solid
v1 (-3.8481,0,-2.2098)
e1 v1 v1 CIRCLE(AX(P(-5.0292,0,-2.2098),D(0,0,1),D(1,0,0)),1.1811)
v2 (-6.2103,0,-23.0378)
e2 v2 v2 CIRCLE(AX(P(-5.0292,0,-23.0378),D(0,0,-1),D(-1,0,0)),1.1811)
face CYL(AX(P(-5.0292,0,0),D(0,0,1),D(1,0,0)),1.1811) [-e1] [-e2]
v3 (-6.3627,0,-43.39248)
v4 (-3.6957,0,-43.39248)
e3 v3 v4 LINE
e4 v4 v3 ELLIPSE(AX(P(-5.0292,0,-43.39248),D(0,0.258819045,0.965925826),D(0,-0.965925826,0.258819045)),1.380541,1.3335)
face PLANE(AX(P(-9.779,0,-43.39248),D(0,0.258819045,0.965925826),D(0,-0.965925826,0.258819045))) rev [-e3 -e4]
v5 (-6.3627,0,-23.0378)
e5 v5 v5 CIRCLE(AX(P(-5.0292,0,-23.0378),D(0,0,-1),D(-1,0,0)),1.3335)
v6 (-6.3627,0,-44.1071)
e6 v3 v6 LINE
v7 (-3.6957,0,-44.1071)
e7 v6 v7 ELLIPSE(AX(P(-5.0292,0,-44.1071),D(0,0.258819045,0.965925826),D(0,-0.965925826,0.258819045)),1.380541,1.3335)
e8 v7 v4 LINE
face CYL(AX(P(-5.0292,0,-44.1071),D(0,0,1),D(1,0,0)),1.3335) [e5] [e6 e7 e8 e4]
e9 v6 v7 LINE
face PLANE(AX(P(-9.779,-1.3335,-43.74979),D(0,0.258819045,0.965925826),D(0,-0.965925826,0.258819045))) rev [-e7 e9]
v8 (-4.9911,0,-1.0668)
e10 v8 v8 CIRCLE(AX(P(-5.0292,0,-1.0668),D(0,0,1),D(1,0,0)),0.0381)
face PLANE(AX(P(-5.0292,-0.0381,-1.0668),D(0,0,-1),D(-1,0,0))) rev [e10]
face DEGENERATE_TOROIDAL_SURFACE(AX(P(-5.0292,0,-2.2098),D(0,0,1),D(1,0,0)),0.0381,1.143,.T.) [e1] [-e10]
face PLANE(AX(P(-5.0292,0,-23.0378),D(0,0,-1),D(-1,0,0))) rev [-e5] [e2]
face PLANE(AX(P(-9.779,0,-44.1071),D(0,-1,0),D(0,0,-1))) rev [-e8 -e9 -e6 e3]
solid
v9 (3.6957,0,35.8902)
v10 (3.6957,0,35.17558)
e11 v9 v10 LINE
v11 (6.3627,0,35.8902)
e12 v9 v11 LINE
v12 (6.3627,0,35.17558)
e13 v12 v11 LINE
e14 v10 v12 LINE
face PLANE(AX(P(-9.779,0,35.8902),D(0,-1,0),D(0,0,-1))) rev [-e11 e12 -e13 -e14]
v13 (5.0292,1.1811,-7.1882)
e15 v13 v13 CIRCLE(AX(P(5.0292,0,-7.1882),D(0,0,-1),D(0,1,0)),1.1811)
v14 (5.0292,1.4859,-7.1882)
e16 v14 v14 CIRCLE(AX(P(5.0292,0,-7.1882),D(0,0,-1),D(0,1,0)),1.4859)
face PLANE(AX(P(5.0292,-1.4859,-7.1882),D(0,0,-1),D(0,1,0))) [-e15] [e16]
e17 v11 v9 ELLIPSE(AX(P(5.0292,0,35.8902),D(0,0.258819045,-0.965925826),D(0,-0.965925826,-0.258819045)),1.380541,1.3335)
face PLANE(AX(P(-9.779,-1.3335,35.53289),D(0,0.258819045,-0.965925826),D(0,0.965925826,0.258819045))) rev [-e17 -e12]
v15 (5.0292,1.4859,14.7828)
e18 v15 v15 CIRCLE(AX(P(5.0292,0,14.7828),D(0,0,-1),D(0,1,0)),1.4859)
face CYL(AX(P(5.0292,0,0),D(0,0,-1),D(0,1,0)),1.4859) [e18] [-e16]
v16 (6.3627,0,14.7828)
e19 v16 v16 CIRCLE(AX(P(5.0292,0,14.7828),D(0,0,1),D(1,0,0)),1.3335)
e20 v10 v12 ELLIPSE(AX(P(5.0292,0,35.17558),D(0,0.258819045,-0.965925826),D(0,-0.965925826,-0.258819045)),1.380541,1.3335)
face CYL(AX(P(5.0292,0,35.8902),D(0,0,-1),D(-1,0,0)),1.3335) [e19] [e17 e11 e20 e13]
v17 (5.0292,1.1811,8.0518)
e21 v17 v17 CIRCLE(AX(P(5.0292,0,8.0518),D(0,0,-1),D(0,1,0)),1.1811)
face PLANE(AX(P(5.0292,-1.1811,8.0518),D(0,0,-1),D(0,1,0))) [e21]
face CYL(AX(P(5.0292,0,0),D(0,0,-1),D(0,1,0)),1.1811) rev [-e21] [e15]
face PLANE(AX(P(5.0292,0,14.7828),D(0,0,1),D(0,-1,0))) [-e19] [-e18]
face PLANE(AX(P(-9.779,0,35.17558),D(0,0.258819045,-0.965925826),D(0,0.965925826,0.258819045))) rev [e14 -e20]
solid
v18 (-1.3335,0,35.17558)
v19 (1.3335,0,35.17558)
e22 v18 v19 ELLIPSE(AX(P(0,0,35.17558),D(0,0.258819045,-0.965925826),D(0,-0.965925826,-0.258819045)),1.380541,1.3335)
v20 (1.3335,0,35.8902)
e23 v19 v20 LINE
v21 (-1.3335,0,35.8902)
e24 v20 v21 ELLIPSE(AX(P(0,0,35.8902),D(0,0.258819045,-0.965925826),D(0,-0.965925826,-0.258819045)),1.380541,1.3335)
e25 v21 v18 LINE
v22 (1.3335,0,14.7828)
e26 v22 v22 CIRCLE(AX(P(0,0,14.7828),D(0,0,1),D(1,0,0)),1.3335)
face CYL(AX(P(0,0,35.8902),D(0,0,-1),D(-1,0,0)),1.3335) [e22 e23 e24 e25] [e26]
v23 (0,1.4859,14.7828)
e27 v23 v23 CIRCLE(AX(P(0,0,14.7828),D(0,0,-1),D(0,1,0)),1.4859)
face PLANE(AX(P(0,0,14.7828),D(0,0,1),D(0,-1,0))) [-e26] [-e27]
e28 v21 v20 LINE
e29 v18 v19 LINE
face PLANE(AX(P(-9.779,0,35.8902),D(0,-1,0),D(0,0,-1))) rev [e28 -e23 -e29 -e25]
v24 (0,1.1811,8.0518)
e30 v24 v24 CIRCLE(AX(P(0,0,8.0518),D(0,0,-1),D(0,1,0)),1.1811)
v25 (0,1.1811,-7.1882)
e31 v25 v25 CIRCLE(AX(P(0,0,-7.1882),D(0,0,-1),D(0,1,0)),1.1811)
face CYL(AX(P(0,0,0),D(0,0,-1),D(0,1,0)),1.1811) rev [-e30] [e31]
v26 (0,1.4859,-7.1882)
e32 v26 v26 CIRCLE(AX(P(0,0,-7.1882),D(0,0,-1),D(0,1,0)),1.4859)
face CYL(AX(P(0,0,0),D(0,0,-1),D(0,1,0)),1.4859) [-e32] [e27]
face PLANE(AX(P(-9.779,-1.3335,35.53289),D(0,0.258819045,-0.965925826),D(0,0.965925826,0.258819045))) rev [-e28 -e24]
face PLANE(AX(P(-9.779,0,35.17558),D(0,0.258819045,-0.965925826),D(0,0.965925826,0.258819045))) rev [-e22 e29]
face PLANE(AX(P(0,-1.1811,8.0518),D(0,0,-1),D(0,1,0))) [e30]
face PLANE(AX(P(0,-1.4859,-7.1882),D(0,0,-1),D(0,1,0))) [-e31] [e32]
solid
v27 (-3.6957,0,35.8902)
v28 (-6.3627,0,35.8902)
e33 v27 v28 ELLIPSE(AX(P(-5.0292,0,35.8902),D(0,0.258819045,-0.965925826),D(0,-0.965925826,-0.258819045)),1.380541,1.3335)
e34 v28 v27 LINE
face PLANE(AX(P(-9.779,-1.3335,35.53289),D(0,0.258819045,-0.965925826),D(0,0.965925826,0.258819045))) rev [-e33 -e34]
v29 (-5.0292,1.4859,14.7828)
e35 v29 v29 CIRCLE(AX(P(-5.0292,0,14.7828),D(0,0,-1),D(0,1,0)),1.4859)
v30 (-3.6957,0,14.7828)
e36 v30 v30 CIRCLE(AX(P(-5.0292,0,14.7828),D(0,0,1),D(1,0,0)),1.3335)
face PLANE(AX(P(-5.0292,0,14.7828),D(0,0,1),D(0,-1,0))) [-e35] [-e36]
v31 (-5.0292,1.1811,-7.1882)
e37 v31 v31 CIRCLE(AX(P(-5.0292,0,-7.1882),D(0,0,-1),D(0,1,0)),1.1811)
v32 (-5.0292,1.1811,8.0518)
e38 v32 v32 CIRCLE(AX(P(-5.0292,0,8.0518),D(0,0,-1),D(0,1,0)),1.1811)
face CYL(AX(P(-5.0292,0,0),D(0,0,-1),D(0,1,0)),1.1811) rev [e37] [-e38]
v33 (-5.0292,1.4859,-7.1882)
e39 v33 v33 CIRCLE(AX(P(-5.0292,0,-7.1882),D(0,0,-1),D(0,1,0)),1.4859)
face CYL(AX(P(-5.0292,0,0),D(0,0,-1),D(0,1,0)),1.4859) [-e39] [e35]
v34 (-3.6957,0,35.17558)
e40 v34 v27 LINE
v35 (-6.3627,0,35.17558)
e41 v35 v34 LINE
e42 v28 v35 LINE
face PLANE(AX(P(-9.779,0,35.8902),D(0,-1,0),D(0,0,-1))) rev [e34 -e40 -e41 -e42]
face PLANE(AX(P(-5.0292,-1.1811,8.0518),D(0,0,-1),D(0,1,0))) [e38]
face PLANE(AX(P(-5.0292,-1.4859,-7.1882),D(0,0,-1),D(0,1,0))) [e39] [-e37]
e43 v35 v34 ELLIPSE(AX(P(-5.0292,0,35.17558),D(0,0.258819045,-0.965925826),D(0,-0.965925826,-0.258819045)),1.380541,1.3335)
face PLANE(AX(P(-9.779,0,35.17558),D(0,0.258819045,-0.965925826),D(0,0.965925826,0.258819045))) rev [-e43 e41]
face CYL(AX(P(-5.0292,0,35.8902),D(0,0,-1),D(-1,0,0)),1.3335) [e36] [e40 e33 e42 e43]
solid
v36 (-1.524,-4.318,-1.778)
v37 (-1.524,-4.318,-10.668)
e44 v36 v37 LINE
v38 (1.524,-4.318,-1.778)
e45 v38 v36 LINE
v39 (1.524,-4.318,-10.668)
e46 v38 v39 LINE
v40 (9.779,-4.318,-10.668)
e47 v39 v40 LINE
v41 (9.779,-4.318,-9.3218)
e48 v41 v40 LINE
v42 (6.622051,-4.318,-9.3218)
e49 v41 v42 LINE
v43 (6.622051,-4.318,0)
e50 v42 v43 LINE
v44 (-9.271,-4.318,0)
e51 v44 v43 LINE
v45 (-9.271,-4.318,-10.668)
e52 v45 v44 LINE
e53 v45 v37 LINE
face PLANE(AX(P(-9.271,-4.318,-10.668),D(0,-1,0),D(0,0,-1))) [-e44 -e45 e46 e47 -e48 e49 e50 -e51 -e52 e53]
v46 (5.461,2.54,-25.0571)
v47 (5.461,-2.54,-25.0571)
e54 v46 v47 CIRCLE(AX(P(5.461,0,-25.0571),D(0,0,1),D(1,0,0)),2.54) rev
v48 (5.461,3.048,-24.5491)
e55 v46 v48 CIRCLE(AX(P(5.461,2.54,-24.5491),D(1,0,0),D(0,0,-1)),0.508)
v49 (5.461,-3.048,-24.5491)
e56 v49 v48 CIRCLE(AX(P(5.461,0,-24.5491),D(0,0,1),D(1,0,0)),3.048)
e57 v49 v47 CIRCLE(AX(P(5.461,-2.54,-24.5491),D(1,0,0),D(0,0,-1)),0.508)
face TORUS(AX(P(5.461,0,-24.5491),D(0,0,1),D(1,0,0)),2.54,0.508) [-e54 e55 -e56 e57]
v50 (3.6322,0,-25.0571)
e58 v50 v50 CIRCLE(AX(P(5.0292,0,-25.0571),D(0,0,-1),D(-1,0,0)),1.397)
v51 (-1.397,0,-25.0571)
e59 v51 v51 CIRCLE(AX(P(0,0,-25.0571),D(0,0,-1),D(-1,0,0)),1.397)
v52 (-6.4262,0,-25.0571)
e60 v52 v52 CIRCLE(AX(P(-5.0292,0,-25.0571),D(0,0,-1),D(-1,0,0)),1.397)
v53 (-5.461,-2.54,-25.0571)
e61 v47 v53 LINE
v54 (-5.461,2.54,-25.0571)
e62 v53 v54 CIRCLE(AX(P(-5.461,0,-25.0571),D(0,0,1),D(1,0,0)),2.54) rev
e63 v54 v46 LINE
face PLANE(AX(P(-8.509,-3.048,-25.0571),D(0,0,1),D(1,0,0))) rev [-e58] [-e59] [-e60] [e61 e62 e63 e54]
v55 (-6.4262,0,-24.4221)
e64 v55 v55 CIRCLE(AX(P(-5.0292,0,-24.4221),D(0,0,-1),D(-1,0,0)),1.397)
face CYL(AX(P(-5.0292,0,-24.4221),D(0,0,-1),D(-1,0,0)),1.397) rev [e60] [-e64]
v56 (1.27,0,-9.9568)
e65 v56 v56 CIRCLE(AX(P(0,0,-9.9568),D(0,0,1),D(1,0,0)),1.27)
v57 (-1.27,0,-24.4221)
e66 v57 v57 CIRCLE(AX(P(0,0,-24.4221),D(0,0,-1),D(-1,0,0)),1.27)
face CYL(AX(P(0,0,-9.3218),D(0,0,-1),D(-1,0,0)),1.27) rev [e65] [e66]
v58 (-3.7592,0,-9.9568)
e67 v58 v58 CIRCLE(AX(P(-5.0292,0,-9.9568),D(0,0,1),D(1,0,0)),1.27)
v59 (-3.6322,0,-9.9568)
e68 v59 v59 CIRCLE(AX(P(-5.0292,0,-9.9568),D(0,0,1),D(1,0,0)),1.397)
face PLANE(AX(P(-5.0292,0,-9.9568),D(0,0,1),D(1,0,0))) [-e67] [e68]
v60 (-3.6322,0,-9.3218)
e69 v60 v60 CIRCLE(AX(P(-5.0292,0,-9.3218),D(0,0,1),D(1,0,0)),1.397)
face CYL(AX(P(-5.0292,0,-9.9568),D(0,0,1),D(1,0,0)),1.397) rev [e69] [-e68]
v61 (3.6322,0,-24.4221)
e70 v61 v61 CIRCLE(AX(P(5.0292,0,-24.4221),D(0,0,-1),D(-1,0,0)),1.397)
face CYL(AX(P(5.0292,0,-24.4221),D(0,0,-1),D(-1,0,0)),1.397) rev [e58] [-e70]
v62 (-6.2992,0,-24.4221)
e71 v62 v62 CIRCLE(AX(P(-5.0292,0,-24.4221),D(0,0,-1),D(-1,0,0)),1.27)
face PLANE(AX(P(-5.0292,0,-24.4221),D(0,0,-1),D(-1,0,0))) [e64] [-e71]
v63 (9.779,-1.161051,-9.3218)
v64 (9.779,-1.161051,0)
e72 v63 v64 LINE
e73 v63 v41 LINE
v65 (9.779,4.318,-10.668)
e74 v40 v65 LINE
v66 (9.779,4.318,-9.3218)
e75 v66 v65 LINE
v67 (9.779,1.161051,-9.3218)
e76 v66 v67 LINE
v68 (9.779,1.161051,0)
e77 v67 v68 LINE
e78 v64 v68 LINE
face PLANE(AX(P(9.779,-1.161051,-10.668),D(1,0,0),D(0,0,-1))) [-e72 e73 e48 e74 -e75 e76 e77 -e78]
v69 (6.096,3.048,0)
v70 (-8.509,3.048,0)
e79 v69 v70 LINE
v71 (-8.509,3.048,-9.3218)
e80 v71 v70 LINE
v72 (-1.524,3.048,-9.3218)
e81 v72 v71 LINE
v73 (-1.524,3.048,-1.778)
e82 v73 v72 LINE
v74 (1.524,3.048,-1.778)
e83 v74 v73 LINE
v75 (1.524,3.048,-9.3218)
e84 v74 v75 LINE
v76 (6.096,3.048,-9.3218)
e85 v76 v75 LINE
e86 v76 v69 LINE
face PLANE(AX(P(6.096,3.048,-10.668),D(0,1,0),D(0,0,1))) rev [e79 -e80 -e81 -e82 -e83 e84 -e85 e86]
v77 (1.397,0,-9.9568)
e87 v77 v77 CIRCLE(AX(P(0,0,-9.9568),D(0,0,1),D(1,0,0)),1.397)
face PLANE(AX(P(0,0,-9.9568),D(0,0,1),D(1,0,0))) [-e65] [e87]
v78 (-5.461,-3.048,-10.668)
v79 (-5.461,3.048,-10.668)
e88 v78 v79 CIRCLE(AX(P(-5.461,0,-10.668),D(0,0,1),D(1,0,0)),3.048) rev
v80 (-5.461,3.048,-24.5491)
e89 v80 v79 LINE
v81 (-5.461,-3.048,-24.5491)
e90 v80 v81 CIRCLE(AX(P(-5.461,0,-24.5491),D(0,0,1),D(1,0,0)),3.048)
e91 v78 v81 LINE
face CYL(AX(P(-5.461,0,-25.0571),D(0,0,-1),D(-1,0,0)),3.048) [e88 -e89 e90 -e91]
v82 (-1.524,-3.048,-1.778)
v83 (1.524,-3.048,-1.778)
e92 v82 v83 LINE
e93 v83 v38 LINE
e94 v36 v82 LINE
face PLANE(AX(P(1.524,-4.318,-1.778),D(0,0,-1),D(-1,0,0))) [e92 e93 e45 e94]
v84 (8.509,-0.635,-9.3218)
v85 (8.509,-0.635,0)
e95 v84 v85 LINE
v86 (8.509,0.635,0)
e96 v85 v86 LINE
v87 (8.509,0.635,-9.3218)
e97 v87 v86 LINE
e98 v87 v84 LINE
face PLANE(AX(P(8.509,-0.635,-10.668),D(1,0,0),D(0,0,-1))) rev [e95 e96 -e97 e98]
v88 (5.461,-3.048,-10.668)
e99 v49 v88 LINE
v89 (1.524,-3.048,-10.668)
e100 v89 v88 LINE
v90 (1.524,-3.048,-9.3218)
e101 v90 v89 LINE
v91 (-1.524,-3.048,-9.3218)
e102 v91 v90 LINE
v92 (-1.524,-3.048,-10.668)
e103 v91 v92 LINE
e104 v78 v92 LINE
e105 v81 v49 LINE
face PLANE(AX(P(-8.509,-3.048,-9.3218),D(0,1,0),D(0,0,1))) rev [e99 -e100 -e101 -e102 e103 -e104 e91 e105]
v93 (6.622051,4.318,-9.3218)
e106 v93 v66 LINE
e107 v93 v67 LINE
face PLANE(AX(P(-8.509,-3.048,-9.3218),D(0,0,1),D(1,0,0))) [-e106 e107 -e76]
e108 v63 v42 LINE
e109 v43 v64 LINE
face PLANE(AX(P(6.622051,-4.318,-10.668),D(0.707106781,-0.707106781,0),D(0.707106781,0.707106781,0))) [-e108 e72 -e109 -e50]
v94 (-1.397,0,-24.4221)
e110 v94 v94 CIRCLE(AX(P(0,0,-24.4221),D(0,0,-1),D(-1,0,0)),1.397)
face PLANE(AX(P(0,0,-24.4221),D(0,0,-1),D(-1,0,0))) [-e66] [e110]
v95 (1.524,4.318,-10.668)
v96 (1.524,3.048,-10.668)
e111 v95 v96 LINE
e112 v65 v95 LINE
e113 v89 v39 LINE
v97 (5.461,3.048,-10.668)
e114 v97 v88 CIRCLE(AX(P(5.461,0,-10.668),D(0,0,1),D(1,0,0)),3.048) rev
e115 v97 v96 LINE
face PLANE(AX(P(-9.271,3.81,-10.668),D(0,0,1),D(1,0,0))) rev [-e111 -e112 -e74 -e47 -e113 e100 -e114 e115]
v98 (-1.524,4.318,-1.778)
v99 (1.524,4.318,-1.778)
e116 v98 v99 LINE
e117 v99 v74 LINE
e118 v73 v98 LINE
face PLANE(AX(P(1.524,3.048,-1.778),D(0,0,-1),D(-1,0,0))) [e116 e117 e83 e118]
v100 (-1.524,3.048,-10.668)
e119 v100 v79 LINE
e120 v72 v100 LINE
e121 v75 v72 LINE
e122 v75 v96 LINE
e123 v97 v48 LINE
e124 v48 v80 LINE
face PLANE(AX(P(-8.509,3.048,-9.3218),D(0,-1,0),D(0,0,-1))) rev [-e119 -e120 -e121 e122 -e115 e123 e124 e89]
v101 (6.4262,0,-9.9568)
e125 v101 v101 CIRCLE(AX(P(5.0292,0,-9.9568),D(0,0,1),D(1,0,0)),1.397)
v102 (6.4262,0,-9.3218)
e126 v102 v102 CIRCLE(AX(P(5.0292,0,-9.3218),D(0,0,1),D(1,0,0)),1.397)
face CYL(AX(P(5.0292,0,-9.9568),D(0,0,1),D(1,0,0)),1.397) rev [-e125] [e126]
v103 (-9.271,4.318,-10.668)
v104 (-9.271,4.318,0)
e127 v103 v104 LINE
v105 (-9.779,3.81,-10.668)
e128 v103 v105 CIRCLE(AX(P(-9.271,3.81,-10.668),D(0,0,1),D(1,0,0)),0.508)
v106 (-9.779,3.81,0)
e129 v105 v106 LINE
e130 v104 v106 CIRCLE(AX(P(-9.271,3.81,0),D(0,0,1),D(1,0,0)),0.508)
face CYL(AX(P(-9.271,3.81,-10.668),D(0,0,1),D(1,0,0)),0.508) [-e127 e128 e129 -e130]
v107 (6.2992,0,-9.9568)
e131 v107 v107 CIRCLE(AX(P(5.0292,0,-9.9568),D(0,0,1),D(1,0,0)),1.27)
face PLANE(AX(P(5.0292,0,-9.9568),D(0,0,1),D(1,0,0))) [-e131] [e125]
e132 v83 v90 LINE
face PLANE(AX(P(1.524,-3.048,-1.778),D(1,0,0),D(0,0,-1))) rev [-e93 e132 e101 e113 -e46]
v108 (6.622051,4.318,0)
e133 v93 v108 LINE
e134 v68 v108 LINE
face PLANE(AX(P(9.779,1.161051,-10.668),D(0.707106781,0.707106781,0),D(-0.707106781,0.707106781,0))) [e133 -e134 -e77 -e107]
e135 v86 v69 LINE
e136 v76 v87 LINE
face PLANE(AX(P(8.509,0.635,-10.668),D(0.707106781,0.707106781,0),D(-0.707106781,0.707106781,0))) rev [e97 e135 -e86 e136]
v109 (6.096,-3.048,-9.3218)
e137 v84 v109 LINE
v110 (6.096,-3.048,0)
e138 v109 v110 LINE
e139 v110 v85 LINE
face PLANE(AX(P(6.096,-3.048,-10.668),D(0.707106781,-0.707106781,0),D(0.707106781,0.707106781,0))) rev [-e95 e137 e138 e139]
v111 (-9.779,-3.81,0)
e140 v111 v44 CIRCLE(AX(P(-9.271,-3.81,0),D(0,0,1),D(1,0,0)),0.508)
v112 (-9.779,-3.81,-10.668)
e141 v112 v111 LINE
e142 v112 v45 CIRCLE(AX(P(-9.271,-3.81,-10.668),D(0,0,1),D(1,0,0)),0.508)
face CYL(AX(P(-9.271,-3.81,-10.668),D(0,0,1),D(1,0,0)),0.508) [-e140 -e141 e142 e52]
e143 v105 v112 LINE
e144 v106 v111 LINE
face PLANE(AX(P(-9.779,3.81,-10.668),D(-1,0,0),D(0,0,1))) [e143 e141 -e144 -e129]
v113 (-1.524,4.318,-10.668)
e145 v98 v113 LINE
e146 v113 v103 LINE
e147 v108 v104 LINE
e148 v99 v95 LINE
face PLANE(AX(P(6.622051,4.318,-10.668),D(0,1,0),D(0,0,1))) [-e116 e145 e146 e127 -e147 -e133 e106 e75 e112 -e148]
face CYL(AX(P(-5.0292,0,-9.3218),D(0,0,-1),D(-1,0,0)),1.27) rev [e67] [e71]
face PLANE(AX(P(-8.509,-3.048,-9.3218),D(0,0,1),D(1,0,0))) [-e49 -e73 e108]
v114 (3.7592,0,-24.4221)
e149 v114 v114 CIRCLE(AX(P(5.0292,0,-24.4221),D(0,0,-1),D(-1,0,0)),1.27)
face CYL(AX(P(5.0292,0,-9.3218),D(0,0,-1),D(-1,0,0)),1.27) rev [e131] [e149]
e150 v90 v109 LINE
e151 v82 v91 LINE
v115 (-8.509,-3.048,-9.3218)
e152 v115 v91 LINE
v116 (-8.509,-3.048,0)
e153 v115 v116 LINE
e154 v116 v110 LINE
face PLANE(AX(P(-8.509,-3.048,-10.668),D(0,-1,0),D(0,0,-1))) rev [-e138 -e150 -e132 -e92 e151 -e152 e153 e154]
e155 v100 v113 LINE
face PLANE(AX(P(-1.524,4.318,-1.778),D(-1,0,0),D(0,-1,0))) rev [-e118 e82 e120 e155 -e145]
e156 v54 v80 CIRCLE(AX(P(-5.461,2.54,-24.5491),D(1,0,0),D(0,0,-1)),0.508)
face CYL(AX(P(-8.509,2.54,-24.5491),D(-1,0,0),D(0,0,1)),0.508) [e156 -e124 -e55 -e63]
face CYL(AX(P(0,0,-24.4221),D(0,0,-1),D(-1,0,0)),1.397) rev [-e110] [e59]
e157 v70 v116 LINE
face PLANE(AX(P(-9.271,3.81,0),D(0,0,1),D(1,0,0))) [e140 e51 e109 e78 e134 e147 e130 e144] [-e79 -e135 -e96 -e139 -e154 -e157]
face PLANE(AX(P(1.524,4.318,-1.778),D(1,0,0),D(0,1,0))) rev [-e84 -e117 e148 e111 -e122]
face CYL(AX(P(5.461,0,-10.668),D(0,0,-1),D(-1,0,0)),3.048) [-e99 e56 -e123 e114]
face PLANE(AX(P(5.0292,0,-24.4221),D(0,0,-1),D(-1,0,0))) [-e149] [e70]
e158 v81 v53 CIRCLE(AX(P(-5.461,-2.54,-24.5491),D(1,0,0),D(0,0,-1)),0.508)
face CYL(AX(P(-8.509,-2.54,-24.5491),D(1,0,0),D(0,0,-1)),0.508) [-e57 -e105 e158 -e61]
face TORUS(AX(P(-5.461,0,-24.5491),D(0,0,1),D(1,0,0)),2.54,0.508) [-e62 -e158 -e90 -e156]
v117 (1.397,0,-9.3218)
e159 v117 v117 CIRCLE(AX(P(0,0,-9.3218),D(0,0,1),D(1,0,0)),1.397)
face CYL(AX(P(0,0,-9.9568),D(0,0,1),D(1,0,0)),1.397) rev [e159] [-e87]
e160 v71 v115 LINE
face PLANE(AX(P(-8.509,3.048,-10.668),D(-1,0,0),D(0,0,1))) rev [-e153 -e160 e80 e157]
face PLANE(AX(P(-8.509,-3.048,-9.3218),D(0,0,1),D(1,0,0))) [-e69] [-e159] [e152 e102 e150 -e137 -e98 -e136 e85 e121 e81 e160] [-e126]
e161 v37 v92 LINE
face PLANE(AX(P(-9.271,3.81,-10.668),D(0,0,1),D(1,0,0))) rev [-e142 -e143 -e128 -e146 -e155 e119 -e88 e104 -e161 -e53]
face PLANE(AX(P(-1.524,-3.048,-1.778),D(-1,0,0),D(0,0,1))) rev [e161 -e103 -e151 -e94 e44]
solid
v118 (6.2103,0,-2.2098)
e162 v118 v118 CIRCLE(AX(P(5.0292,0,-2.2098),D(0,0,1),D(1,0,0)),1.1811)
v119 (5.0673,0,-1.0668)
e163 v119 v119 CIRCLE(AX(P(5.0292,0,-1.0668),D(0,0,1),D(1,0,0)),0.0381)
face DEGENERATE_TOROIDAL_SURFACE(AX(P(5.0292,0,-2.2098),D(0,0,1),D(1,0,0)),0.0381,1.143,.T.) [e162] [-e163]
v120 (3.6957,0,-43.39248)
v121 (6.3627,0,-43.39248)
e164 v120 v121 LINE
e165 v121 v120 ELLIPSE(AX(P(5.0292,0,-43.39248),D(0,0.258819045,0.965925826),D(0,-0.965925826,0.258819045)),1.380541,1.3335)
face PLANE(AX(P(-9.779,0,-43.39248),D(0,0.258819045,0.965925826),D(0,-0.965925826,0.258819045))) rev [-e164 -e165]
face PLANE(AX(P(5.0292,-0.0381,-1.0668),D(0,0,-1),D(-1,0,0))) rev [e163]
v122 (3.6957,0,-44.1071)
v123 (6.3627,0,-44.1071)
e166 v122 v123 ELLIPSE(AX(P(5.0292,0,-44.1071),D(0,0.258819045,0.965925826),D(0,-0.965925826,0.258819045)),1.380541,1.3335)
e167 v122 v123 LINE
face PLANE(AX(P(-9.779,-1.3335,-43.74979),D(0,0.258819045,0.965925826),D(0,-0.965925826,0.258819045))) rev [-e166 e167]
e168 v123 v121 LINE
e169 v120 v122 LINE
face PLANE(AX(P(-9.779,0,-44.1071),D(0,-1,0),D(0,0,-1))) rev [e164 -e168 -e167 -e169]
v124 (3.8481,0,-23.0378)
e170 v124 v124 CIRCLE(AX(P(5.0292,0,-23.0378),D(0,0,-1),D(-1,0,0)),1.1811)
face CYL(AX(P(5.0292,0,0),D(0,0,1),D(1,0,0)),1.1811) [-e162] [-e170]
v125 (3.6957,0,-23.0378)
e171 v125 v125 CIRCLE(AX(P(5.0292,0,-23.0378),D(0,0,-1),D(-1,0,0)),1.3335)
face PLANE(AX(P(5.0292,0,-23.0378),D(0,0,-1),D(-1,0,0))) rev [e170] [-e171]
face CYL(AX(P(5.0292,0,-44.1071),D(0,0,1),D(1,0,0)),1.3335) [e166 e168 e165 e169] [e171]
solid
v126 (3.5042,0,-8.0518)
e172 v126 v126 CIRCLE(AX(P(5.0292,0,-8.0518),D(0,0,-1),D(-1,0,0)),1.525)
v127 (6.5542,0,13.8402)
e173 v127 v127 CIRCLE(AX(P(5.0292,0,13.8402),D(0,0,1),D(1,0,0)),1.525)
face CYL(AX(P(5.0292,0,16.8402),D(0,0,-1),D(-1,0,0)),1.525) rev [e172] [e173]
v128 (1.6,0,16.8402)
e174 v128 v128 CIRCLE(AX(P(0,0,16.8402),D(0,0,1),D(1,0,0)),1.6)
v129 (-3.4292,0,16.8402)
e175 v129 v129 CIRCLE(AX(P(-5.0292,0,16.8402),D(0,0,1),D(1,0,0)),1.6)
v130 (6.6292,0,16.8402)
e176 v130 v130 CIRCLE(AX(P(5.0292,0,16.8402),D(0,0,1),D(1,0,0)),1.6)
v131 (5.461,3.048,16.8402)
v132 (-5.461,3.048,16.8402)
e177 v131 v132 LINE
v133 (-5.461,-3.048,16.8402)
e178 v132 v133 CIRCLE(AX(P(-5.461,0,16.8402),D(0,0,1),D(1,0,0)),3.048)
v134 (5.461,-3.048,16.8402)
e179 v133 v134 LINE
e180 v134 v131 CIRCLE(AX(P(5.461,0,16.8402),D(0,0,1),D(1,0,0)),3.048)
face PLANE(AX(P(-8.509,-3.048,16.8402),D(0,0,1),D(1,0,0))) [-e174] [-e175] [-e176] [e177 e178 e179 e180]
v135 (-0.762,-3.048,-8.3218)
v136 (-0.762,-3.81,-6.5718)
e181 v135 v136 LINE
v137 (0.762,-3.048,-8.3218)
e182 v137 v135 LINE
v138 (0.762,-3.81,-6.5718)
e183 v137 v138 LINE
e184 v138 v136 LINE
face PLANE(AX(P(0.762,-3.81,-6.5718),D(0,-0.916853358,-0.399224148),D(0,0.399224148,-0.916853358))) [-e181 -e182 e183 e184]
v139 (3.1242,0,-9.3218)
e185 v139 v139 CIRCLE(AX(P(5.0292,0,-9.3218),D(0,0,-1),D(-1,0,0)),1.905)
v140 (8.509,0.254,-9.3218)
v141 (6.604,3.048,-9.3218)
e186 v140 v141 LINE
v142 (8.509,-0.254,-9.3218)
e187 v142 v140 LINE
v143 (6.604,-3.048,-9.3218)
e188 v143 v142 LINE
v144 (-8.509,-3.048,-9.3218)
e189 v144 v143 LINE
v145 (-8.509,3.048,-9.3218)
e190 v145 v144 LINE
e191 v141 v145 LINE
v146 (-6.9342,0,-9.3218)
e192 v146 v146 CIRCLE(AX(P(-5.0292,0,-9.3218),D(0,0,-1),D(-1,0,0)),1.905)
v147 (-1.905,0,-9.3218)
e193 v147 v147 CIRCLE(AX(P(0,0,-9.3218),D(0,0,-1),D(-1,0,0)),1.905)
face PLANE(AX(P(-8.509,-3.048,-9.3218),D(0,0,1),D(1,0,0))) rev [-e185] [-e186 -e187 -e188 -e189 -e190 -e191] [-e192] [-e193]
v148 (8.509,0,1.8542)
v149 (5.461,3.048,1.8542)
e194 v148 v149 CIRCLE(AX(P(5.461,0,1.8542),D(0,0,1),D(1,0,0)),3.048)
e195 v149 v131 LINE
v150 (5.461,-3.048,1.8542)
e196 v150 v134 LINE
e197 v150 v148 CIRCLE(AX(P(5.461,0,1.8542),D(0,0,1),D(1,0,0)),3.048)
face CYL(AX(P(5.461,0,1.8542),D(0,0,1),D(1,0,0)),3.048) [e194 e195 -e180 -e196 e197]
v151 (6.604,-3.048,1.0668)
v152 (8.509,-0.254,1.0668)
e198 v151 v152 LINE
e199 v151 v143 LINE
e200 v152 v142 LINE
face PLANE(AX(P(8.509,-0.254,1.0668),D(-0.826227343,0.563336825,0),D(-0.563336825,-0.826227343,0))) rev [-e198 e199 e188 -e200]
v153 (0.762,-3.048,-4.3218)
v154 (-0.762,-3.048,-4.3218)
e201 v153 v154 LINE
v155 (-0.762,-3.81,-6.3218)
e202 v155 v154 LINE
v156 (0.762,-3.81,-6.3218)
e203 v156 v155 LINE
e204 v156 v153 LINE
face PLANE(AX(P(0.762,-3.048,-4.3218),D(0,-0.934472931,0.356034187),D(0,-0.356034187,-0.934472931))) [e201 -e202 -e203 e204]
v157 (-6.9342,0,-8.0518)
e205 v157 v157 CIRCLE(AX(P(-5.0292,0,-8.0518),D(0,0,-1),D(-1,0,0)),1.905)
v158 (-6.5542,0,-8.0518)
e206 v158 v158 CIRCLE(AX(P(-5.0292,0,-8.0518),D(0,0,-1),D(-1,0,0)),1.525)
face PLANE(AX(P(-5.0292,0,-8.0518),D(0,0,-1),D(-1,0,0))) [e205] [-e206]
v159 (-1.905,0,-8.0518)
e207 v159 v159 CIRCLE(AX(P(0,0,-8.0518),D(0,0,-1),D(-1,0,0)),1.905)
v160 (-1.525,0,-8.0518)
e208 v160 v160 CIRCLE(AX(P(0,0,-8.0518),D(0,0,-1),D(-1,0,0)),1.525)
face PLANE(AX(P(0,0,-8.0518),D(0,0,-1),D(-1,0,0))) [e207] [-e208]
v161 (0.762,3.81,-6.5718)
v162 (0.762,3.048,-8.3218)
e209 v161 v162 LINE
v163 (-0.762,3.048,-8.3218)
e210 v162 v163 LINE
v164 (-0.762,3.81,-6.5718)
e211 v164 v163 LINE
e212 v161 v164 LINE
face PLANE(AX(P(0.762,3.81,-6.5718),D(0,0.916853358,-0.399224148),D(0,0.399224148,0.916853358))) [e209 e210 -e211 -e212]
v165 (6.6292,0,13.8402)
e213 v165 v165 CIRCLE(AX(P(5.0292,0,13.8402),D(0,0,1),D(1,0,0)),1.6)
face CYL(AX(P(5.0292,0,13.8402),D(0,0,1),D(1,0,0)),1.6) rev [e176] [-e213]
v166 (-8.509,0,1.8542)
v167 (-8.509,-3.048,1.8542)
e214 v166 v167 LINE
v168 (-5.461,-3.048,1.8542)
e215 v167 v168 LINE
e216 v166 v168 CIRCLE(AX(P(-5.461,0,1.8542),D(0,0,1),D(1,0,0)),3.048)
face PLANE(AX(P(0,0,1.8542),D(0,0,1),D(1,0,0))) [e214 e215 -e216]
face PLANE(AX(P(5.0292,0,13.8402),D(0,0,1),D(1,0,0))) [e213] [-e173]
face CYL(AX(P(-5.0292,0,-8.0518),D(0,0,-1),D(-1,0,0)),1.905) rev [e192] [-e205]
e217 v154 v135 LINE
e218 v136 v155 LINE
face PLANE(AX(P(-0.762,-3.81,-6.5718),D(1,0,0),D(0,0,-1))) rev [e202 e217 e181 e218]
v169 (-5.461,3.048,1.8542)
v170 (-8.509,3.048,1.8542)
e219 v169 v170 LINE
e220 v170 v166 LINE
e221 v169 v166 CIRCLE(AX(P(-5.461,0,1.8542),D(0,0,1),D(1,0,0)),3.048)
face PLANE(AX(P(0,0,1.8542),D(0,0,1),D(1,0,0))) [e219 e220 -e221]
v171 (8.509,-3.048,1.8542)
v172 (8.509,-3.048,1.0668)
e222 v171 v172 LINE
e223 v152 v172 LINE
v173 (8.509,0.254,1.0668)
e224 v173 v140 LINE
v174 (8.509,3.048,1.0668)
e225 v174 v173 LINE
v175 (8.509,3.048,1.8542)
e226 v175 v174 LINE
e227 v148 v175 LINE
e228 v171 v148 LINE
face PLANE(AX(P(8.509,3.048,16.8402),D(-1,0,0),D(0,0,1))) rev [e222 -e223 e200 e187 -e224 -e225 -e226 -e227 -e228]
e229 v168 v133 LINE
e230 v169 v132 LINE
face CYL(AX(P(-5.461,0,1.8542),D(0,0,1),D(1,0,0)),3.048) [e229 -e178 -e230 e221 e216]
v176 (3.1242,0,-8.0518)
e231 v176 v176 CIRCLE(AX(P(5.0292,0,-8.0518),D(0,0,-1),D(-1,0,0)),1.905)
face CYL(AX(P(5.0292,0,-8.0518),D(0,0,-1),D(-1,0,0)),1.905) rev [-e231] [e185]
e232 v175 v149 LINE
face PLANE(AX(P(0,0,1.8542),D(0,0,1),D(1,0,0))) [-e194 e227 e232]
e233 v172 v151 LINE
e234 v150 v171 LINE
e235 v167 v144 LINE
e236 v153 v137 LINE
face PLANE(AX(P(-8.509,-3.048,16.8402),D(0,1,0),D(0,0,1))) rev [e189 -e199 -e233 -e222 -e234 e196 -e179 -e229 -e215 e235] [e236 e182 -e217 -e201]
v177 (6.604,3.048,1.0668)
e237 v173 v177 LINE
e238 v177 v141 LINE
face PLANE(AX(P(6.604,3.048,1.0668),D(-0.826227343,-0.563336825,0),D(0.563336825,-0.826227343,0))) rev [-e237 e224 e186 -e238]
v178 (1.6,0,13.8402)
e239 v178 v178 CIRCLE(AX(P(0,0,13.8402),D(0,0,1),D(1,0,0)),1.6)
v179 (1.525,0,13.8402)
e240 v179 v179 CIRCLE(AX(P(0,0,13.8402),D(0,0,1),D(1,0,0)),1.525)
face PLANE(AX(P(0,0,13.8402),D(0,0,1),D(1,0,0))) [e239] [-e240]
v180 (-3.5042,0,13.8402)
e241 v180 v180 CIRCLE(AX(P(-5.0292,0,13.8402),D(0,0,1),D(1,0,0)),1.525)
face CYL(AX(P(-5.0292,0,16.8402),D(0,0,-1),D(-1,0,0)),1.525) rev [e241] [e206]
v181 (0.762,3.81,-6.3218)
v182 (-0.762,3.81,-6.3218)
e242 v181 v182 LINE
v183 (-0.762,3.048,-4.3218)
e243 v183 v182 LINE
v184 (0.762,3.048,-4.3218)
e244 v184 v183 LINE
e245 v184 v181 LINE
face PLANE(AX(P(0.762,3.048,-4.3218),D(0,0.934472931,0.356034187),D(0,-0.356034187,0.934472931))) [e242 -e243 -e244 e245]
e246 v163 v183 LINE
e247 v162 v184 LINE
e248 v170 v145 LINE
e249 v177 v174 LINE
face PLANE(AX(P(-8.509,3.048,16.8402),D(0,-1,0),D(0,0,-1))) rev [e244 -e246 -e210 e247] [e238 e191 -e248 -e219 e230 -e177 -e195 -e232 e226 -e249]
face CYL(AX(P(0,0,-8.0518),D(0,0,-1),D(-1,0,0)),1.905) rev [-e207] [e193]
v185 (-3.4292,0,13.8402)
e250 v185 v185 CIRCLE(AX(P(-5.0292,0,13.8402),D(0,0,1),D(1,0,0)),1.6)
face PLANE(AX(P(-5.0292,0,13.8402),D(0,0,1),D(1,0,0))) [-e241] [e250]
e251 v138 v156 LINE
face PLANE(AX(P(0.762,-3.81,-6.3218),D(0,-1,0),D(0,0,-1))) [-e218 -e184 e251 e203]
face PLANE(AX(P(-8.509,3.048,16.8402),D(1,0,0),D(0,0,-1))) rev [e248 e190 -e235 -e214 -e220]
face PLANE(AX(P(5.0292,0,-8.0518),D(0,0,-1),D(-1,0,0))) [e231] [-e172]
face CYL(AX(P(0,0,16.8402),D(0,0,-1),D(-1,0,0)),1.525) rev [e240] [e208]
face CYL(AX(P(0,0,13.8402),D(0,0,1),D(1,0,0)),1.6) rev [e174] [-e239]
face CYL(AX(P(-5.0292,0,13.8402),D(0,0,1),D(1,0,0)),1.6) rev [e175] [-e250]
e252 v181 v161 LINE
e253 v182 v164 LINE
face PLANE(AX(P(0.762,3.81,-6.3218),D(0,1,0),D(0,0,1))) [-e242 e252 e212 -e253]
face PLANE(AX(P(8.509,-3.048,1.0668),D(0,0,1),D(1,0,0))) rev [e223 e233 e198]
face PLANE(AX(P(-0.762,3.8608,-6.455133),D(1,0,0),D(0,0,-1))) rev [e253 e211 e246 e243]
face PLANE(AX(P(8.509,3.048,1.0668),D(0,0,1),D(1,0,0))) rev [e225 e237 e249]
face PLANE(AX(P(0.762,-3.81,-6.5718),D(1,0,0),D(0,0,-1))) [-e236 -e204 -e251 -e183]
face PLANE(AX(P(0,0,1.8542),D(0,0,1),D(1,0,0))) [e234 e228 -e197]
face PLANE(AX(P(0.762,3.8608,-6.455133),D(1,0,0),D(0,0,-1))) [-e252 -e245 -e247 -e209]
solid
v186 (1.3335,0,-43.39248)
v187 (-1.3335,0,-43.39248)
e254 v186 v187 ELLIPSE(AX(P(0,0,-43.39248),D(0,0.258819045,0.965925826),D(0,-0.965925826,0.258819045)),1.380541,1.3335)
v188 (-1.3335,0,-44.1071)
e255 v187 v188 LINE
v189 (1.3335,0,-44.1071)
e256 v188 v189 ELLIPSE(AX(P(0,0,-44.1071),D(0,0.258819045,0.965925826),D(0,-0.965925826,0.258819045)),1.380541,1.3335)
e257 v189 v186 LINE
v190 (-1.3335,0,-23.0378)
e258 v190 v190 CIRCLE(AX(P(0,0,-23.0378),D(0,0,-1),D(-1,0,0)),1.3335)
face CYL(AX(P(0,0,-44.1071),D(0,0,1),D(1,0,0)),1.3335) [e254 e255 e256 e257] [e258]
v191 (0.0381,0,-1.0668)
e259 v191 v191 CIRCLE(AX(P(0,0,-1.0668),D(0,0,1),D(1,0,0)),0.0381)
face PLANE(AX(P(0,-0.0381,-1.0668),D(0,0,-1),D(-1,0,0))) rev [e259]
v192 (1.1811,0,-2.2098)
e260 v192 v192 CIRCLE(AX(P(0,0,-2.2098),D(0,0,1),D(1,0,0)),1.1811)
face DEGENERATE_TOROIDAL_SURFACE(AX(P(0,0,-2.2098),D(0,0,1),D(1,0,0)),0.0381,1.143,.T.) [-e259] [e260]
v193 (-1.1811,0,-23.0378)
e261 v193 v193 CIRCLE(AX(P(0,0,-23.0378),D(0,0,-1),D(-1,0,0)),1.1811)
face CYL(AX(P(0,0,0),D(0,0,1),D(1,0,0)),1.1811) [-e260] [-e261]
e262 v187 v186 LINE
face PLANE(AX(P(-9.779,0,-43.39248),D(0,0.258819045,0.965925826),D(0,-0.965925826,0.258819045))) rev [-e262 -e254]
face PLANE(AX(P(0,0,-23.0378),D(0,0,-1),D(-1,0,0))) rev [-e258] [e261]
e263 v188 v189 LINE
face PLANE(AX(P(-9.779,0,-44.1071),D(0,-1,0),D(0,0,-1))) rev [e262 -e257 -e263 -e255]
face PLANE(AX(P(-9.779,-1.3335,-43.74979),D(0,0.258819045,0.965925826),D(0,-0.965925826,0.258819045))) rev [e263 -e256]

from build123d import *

# Parameters (mm, degrees)
BOSS_EXTRUDE1_DEPTH           = 10.668
SKETCH2_W                     = 17.018
SKETCH2_H                     = 6.096
SKETCH2_R                     = 1.27
BOSS_EXTRUDE2_DEPTH           = 15.7353
BOSS_EXTRUDE3_DEPTH           = 1.3462
FILLET1_RADIUS                = 3.048
FILLET1_LENGTH                = 14.3891
FILLET2_RADIUS                = 3.048
FILLET2_LENGTH                = 14.3891
FILLET3_R                     = 0.508
SKETCH4_R                     = 1.397
CUT_EXTRUDE1_DEPTH            = 0.635
CUT_EXTRUDE2_START            = -0.635
SKETCH5_R                     = 1.397
CUT_EXTRUDE2_DEPTH            = 0.635
SKETCH6_W                     = 3.048
SKETCH6_H                     = 1.27
CUT_EXTRUDE3_DEPTH            = 8.89
SKETCH7_W                     = 17.018
SKETCH7_H                     = 6.096
SKETCH7_R                     = 1.525
BOSS_EXTRUDE4_DEPTH           = 26.162
CUT_EXTRUDE4_DEPTH            = 10.3886
SKETCH9_OUTSIDE_W             = 30.966
SKETCH9_OUTSIDE_H             = 20.044
CUT_EXTRUDE5_DEPTH            = 14.986
SKETCH10_R                    = 1.6
CUT_EXTRUDE6_DEPTH            = 3
SKETCH11_R                    = 1.905
CUT_EXTRUDE7_DEPTH            = 1.27
BOSS_EXTRUDE5_START           = -7.747
BOSS_EXTRUDE5_DEPTH           = 1.524
SKETCH14_R                    = 1.3335
BOSS_EXTRUDE6_DEPTH           = 21.0693
SKETCH16_R                    = 1.3335
BOSS_EXTRUDE7_DEPTH           = 21.1074
BODY_MOVE_COPY1_START         = 8.0518
BODY_MOVE_COPY1_OUTLINE_R     = 1.3335
BODY_MOVE_COPY1_DEPTH         = 27.8384
BODY_MOVE_COPY1_START_2       = -7.1882
BODY_MOVE_COPY1_2_OUTLINE_R   = 1.4859
BODY_MOVE_COPY1_2_OUTLINE_R_2 = 1.1811
BODY_MOVE_COPY1_2_DEPTH       = 21.971
BODY_MOVE_COPY2_START         = 8.0518
BODY_MOVE_COPY2_OUTLINE_R     = 1.3335
BODY_MOVE_COPY2_DEPTH         = 27.8384
BODY_MOVE_COPY2_START_2       = -7.1882
BODY_MOVE_COPY2_2_OUTLINE_R   = 1.4859
BODY_MOVE_COPY2_2_OUTLINE_R_2 = 1.1811
BODY_MOVE_COPY2_2_DEPTH       = 21.971
CUT_EXTRUDE8_DEPTH            = 46.384030621
CUT_EXTRUDE8_DEPTH_BACK       = 46.384030621


# Read off the part's stored shape, not the designer's step: Body-Move/Copy1, Body-Move/Copy2
with BuildPart() as part:
    # Sketch1 → Boss-Extrude1 (new body)
    with BuildSketch(Plane.XY):
        with BuildLine():
            Line((6.622051224, 4.318), (-9.271, 4.318))
            ThreePointArc((-9.271, 4.318), (-9.630210245, 4.169210245), (-9.779, 3.81))
            Line((-9.779, 3.81), (-9.779, -3.81))
            ThreePointArc((-9.779, -3.81), (-9.630210245, -4.169210245), (-9.271, -4.318))
            Line((-9.271, -4.318), (6.622051224, -4.318))
            Line((6.622051224, -4.318), (9.779, -1.161051224))
            Line((9.779, -1.161051224), (9.779, 1.161051224))
            Line((9.779, 1.161051224), (6.622051224, 4.318))
        make_face()
        Polygon((8.509, -0.635), (8.509, 0.635), (6.096, 3.048), (-8.509, 3.048), (-8.509, -3.048), (6.096, -3.048), align=None, mode=Mode.SUBTRACT)
    extrude(amount=-BOSS_EXTRUDE1_DEPTH)

    # Sketch2 → Boss-Extrude2 (add)
    with BuildSketch(Plane.XY.offset(-25.0571)):
        Rectangle(SKETCH2_W, SKETCH2_H)
        Circle(SKETCH2_R, mode=Mode.SUBTRACT)
        with Locations((5.0292, 0)):
            Circle(SKETCH2_R, mode=Mode.SUBTRACT)
        with Locations((-5.0292, 0)):
            Circle(SKETCH2_R, mode=Mode.SUBTRACT)
    extrude(amount=BOSS_EXTRUDE2_DEPTH)

    # Sketch3 → Boss-Extrude3 (add)
    with BuildSketch(Plane(origin=(0, 0, -10.668), x_dir=(-1, 0, 0), z_dir=(0, 0, -1))):
        Polygon((-6.622051224, 4.318), (-9.779, 1.161051224), (-9.779, 4.318), align=None)
        Polygon((-9.779, -1.161051224), (-6.622051224, -4.318), (-9.779, -4.318), align=None)
    extrude(amount=-BOSS_EXTRUDE3_DEPTH)

    # Fillet1: full round fillet: the end face becomes a half cylinder, R = half its width
    fillet1_face = Plane((8.509, 0, -17.86255), x_dir=(0, 0, -1), z_dir=(1, 0, 0))  # on the end face: x along it, z out of the body
    fillet1_slab = fillet1_face.offset(-FILLET1_RADIUS / 2) * Box(FILLET1_LENGTH, 2 * FILLET1_RADIUS, FILLET1_RADIUS, mode=Mode.PRIVATE)  # the body's end, R deep
    fillet1_round = Plane((5.461, 0, -17.86255), x_dir=(1, 0, 0), z_dir=(0, 0, -1)) * Cylinder(FILLET1_RADIUS, FILLET1_LENGTH, mode=Mode.PRIVATE)  # its axis R under the face
    add(fillet1_slab - fillet1_round, mode=Mode.SUBTRACT)

    # Fillet2: full round fillet: the end face becomes a half cylinder, R = half its width
    fillet2_face = Plane((-8.509, 0, -17.86255), x_dir=(0, 0, 1), z_dir=(-1, 0, 0))  # on the end face: x along it, z out of the body
    fillet2_slab = fillet2_face.offset(-FILLET2_RADIUS / 2) * Box(FILLET2_LENGTH, 2 * FILLET2_RADIUS, FILLET2_RADIUS, mode=Mode.PRIVATE)  # the body's end, R deep
    fillet2_round = Plane((-5.461, 0, -17.86255), x_dir=(-1, 0, 0), z_dir=(0, 0, 1)) * Cylinder(FILLET2_RADIUS, FILLET2_LENGTH, mode=Mode.PRIVATE)  # its axis R under the face
    add(fillet2_slab - fillet2_round, mode=Mode.SUBTRACT)

    # Fillet3
    fillet3_edges = [part.edges().sort_by_distance(p)[0] for p in [
        (0, 3.048, -25.0571),
        (8.509, 0, -25.0571),
        (0, -3.048, -25.0571),
        (-8.509, 0, -25.0571),
    ]]
    fillet(fillet3_edges, radius=FILLET3_R)

    # Sketch4 → Cut-Extrude1 (cut)
    with BuildSketch(Plane(origin=(0, 0, -25.0571), x_dir=(-1, 0, 0), z_dir=(0, 0, -1))):
        with Locations((-5.0292, 0)):
            Circle(SKETCH4_R)
        Circle(SKETCH4_R)
        with Locations((5.0292, 0)):
            Circle(SKETCH4_R)
    extrude(amount=-CUT_EXTRUDE1_DEPTH, mode=Mode.SUBTRACT)

    # Sketch5 → Cut-Extrude2 (cut)
    with BuildSketch(Plane.XY.offset(-9.3218).offset(CUT_EXTRUDE2_START)):
        with Locations(Location((-5.0292, 0, 0), (0, 0, 180))):
            Circle(SKETCH5_R)
        with Locations(Location((0, 0, 0), (0, 0, 180))):
            Circle(SKETCH5_R)
        with Locations(Location((5.0292, 0, 0), (0, 0, 180))):
            Circle(SKETCH5_R)
    extrude(amount=CUT_EXTRUDE2_DEPTH, mode=Mode.SUBTRACT)

    # Sketch6 → Cut-Extrude3 (cut)
    with BuildSketch(Plane(origin=(0, 0, -10.668), x_dir=(-1, 0, 0), z_dir=(0, 0, -1))):
        with Locations((0, 3.683)):
            Rectangle(SKETCH6_W, SKETCH6_H)
        with Locations((0, -3.683)):
            Rectangle(SKETCH6_W, SKETCH6_H)
    extrude(amount=-CUT_EXTRUDE3_DEPTH, mode=Mode.SUBTRACT)


with BuildPart() as body_2:
    # Sketch7 → Boss-Extrude4 (new body)
    with BuildSketch(Plane.XY.offset(-9.3218)):
        Rectangle(SKETCH7_W, SKETCH7_H)
        Circle(SKETCH7_R, mode=Mode.SUBTRACT)
        with Locations((5.0292, 0)):
            Circle(SKETCH7_R, mode=Mode.SUBTRACT)
        with Locations((-5.0292, 0)):
            Circle(SKETCH7_R, mode=Mode.SUBTRACT)
    extrude(amount=BOSS_EXTRUDE4_DEPTH)

    # Sketch8 → Cut-Extrude4 (cut)
    with BuildSketch(Plane(origin=(0, 0, -9.3218), x_dir=(-1, 0, 0), z_dir=(0, 0, -1))):
        Polygon((-8.509, 3.048), (-6.604, 3.048), (-8.509, 0.254), align=None)
        Polygon((-8.509, -3.048), (-8.509, -0.254), (-6.604, -3.048), align=None)
    extrude(amount=-CUT_EXTRUDE4_DEPTH, mode=Mode.SUBTRACT)

    # Sketch9 outside → Cut-Extrude5 (cut)
    with BuildSketch(Plane.XY.offset(16.8402)):
        Rectangle(SKETCH9_OUTSIDE_W, SKETCH9_OUTSIDE_H)
        with BuildLine():
            Line((5.461, 3.048), (-5.461, 3.048))
            ThreePointArc((-5.461, 3.048), (-8.509, 0), (-5.461, -3.048))
            Line((-5.461, -3.048), (5.461, -3.048))
            ThreePointArc((5.461, -3.048), (8.509, 0), (5.461, 3.048))
        make_face(mode=Mode.SUBTRACT)
    extrude(amount=-CUT_EXTRUDE5_DEPTH, mode=Mode.SUBTRACT)

    # Sketch10 → Cut-Extrude6 (cut)
    with BuildSketch(Plane.XY.offset(16.8402)):
        Circle(SKETCH10_R)
        with Locations((5.0292, 0)):
            Circle(SKETCH10_R)
        with Locations((-5.0292, 0)):
            Circle(SKETCH10_R)
    extrude(amount=-CUT_EXTRUDE6_DEPTH, mode=Mode.SUBTRACT)

    # Sketch11 → Cut-Extrude7 (cut)
    with BuildSketch(Plane(origin=(0, 0, -9.3218), x_dir=(-1, 0, 0), z_dir=(0, 0, -1))):
        with Locations((-5.0292, 0)):
            Circle(SKETCH11_R)
        Circle(SKETCH11_R)
        with Locations((5.0292, 0)):
            Circle(SKETCH11_R)
    extrude(amount=-CUT_EXTRUDE7_DEPTH, mode=Mode.SUBTRACT)

    # Sketch12 → Boss-Extrude5 (add)
    with BuildSketch(Plane.ZY.offset(8.509).offset(BOSS_EXTRUDE5_START)):
        Polygon((-8.3218, 3.048), (-4.3218, 3.048), (-6.3218, 3.81), (-6.5718, 3.81), align=None)
        Polygon((-6.5718, -3.81), (-8.3218, -3.048), (-4.3218, -3.048), (-6.3218, -3.81), align=None)
    extrude(amount=-BOSS_EXTRUDE5_DEPTH)


with BuildPart() as body_3:
    # Sketch13 → Revolve1 (revolve)
    with BuildSketch(Plane(origin=(5.0292, 0, 0), x_dir=(0, 0, -1), z_dir=(1, 0, 0)), mode=Mode.PRIVATE) as revolve1_sk:
        with BuildLine():
            Line((1.0668, 0.0381), (1.0668, 0))
            Line((1.0668, 0), (23.0378, 0))
            Line((23.0378, 0), (23.0378, 1.1811))
            Line((23.0378, 1.1811), (2.2098, 1.1811))
            ThreePointArc((2.2098, 1.1811), (1.401576949, 0.846323051), (1.0668, 0.0381))
        make_face()
    revolve(revolve1_sk.sketch.rotate(Axis((5.0292, 0, 0), (0, 0, -1)), 90), axis=Axis((5.0292, 0, 0), (0, 0, -1)))

    # Sketch14 → Boss-Extrude6 (add)
    with BuildSketch(Plane(origin=(0, 0, -23.0378), x_dir=(-1, 0, 0), z_dir=(0, 0, -1))):
        with Locations((-5.0292, 0)):
            Circle(SKETCH14_R)
    extrude(amount=BOSS_EXTRUDE6_DEPTH)


with BuildPart() as body_4:
    # Sketch15 → Revolve2 (revolve)
    with BuildSketch(Plane(origin=(5.0292, 0, 0), x_dir=(0, 0, -1), z_dir=(1, 0, 0))):
        Polygon((-14.7828, 0), (-14.7828, 1.4859), (7.1882, 1.4859), (7.1882, 1.1811), (-8.0518, 1.1811), (-8.0518, 0), align=None)
    revolve(axis=Axis((5.0292, 0, 0), (0, 0, 1)))

    # Sketch16 → Boss-Extrude7 (add)
    with BuildSketch(Plane.XY.offset(14.7828)):
        with Locations((5.0292, 0)):
            Circle(SKETCH16_R)
    extrude(amount=BOSS_EXTRUDE7_DEPTH)


with BuildPart() as body_5:
    # Body-Move/Copy1 outline → Body-Move/Copy1 (new body)
    with BuildSketch(Plane.XY.offset(BODY_MOVE_COPY1_START)):
        Circle(BODY_MOVE_COPY1_OUTLINE_R)
    extrude(amount=BODY_MOVE_COPY1_DEPTH)

    # Body-Move_Copy1 2 outline → Body-Move_Copy1 2 (add)
    with BuildSketch(Plane.XY.offset(BODY_MOVE_COPY1_START_2)):
        Circle(BODY_MOVE_COPY1_2_OUTLINE_R)
        Circle(BODY_MOVE_COPY1_2_OUTLINE_R_2, mode=Mode.SUBTRACT)
    extrude(amount=BODY_MOVE_COPY1_2_DEPTH)


with BuildPart() as body_6:
    # Body-Move_Copy1 3 outline → Body-Move_Copy1 3 (revolve)
    with BuildSketch(Plane.XZ):
        with BuildLine():
            Line((1.3335, -44.1071), (1.3335, -23.0378))
            Line((1.3335, -23.0378), (1.1811, -23.0378))
            Line((1.1811, -23.0378), (1.1811, -2.2098))
            ThreePointArc((1.1811, -2.2098), (0.846323051, -1.401576949), (0.0381, -1.0668))
            Line((0.0381, -1.0668), (0, -1.0668))
            Line((0, -1.0668), (0, -44.1071))
            Line((0, -44.1071), (1.3335, -44.1071))
        make_face()
    revolve(axis=Axis((0, 0, 0), (0, 0, 1)))


with BuildPart() as body_7:
    # Body-Move/Copy2 outline → Body-Move/Copy2 (new body)
    with BuildSketch(Plane.XY.offset(BODY_MOVE_COPY2_START)):
        with Locations((-5.0292, 0)):
            Circle(BODY_MOVE_COPY2_OUTLINE_R)
    extrude(amount=BODY_MOVE_COPY2_DEPTH)

    # Body-Move_Copy2 2 outline → Body-Move_Copy2 2 (add)
    with BuildSketch(Plane.XY.offset(BODY_MOVE_COPY2_START_2)):
        with Locations((-5.0292, 0)):
            Circle(BODY_MOVE_COPY2_2_OUTLINE_R)
        with Locations((-5.0292, 0)):
            Circle(BODY_MOVE_COPY2_2_OUTLINE_R_2, mode=Mode.SUBTRACT)
    extrude(amount=BODY_MOVE_COPY2_2_DEPTH)


with BuildPart() as body_8:
    # Body-Move_Copy2 3 outline → Body-Move_Copy2 3 (revolve)
    with BuildSketch(Plane(origin=(-5.0292, 0, 0), x_dir=(1, 0, 0), z_dir=(0, -1, 0))):
        with BuildLine():
            Line((0.0381, -1.0668), (0, -1.0668))
            Line((0, -1.0668), (0, -44.1071))
            Line((0, -44.1071), (1.3335, -44.1071))
            Line((1.3335, -44.1071), (1.3335, -23.0378))
            Line((1.3335, -23.0378), (1.1811, -23.0378))
            Line((1.1811, -23.0378), (1.1811, -2.2098))
            ThreePointArc((1.1811, -2.2098), (0.846323051, -1.401576949), (0.0381, -1.0668))
        make_face()
    revolve(axis=Axis((-5.0292, 0, 0), (0, 0, 1)))


with BuildPart() as cut_extrude8_tool:
    # Sketch17 → Cut-Extrude8 (new, two sides: drawn at the far end of the back side and taken through both)
    with BuildSketch(Plane(origin=(0, 0, 0), x_dir=(0, 0, -1), z_dir=(1, 0, 0)).offset(-CUT_EXTRUDE8_DEPTH_BACK)):
        Polygon((-35.8902, 0), (-35.175579504, 0), (-35.532889752, 1.3335), (-36.5252, 1.3335), (-36.5252, -1.3335), (-35.532889752, -1.3335), align=None)
        Polygon((43.749789752, 1.3335), (44.7421, 1.3335), (44.7421, -1.3335), (43.749789752, -1.3335), (44.1071, 0), (43.392479504, 0), align=None)
    extrude(amount=CUT_EXTRUDE8_DEPTH + CUT_EXTRUDE8_DEPTH_BACK)


with BuildPart() as body_3_1:
    add(body_3.part)

    # Cut-Extrude8: cut by cut_extrude8_tool
    add(cut_extrude8_tool.part, mode=Mode.SUBTRACT)


with BuildPart() as body_4_1:
    add(body_4.part)

    # Cut-Extrude8: cut by cut_extrude8_tool
    add(cut_extrude8_tool.part, mode=Mode.SUBTRACT)


with BuildPart() as body_5_1:
    add(body_5.part)

    # Cut-Extrude8: cut by cut_extrude8_tool
    add(cut_extrude8_tool.part, mode=Mode.SUBTRACT)


with BuildPart() as body_6_1:
    add(body_6.part)

    # Cut-Extrude8: cut by cut_extrude8_tool
    add(cut_extrude8_tool.part, mode=Mode.SUBTRACT)


with BuildPart() as body_7_1:
    add(body_7.part)

    # Cut-Extrude8: cut by cut_extrude8_tool
    add(cut_extrude8_tool.part, mode=Mode.SUBTRACT)


with BuildPart() as body_8_1:
    add(body_8.part)

    # Cut-Extrude8: cut by cut_extrude8_tool
    add(cut_extrude8_tool.part, mode=Mode.SUBTRACT)


solid = Compound([part.part, body_2.part, body_3_1.part, body_4_1.part, body_5_1.part, body_6_1.part, body_7_1.part, body_8_1.part])
